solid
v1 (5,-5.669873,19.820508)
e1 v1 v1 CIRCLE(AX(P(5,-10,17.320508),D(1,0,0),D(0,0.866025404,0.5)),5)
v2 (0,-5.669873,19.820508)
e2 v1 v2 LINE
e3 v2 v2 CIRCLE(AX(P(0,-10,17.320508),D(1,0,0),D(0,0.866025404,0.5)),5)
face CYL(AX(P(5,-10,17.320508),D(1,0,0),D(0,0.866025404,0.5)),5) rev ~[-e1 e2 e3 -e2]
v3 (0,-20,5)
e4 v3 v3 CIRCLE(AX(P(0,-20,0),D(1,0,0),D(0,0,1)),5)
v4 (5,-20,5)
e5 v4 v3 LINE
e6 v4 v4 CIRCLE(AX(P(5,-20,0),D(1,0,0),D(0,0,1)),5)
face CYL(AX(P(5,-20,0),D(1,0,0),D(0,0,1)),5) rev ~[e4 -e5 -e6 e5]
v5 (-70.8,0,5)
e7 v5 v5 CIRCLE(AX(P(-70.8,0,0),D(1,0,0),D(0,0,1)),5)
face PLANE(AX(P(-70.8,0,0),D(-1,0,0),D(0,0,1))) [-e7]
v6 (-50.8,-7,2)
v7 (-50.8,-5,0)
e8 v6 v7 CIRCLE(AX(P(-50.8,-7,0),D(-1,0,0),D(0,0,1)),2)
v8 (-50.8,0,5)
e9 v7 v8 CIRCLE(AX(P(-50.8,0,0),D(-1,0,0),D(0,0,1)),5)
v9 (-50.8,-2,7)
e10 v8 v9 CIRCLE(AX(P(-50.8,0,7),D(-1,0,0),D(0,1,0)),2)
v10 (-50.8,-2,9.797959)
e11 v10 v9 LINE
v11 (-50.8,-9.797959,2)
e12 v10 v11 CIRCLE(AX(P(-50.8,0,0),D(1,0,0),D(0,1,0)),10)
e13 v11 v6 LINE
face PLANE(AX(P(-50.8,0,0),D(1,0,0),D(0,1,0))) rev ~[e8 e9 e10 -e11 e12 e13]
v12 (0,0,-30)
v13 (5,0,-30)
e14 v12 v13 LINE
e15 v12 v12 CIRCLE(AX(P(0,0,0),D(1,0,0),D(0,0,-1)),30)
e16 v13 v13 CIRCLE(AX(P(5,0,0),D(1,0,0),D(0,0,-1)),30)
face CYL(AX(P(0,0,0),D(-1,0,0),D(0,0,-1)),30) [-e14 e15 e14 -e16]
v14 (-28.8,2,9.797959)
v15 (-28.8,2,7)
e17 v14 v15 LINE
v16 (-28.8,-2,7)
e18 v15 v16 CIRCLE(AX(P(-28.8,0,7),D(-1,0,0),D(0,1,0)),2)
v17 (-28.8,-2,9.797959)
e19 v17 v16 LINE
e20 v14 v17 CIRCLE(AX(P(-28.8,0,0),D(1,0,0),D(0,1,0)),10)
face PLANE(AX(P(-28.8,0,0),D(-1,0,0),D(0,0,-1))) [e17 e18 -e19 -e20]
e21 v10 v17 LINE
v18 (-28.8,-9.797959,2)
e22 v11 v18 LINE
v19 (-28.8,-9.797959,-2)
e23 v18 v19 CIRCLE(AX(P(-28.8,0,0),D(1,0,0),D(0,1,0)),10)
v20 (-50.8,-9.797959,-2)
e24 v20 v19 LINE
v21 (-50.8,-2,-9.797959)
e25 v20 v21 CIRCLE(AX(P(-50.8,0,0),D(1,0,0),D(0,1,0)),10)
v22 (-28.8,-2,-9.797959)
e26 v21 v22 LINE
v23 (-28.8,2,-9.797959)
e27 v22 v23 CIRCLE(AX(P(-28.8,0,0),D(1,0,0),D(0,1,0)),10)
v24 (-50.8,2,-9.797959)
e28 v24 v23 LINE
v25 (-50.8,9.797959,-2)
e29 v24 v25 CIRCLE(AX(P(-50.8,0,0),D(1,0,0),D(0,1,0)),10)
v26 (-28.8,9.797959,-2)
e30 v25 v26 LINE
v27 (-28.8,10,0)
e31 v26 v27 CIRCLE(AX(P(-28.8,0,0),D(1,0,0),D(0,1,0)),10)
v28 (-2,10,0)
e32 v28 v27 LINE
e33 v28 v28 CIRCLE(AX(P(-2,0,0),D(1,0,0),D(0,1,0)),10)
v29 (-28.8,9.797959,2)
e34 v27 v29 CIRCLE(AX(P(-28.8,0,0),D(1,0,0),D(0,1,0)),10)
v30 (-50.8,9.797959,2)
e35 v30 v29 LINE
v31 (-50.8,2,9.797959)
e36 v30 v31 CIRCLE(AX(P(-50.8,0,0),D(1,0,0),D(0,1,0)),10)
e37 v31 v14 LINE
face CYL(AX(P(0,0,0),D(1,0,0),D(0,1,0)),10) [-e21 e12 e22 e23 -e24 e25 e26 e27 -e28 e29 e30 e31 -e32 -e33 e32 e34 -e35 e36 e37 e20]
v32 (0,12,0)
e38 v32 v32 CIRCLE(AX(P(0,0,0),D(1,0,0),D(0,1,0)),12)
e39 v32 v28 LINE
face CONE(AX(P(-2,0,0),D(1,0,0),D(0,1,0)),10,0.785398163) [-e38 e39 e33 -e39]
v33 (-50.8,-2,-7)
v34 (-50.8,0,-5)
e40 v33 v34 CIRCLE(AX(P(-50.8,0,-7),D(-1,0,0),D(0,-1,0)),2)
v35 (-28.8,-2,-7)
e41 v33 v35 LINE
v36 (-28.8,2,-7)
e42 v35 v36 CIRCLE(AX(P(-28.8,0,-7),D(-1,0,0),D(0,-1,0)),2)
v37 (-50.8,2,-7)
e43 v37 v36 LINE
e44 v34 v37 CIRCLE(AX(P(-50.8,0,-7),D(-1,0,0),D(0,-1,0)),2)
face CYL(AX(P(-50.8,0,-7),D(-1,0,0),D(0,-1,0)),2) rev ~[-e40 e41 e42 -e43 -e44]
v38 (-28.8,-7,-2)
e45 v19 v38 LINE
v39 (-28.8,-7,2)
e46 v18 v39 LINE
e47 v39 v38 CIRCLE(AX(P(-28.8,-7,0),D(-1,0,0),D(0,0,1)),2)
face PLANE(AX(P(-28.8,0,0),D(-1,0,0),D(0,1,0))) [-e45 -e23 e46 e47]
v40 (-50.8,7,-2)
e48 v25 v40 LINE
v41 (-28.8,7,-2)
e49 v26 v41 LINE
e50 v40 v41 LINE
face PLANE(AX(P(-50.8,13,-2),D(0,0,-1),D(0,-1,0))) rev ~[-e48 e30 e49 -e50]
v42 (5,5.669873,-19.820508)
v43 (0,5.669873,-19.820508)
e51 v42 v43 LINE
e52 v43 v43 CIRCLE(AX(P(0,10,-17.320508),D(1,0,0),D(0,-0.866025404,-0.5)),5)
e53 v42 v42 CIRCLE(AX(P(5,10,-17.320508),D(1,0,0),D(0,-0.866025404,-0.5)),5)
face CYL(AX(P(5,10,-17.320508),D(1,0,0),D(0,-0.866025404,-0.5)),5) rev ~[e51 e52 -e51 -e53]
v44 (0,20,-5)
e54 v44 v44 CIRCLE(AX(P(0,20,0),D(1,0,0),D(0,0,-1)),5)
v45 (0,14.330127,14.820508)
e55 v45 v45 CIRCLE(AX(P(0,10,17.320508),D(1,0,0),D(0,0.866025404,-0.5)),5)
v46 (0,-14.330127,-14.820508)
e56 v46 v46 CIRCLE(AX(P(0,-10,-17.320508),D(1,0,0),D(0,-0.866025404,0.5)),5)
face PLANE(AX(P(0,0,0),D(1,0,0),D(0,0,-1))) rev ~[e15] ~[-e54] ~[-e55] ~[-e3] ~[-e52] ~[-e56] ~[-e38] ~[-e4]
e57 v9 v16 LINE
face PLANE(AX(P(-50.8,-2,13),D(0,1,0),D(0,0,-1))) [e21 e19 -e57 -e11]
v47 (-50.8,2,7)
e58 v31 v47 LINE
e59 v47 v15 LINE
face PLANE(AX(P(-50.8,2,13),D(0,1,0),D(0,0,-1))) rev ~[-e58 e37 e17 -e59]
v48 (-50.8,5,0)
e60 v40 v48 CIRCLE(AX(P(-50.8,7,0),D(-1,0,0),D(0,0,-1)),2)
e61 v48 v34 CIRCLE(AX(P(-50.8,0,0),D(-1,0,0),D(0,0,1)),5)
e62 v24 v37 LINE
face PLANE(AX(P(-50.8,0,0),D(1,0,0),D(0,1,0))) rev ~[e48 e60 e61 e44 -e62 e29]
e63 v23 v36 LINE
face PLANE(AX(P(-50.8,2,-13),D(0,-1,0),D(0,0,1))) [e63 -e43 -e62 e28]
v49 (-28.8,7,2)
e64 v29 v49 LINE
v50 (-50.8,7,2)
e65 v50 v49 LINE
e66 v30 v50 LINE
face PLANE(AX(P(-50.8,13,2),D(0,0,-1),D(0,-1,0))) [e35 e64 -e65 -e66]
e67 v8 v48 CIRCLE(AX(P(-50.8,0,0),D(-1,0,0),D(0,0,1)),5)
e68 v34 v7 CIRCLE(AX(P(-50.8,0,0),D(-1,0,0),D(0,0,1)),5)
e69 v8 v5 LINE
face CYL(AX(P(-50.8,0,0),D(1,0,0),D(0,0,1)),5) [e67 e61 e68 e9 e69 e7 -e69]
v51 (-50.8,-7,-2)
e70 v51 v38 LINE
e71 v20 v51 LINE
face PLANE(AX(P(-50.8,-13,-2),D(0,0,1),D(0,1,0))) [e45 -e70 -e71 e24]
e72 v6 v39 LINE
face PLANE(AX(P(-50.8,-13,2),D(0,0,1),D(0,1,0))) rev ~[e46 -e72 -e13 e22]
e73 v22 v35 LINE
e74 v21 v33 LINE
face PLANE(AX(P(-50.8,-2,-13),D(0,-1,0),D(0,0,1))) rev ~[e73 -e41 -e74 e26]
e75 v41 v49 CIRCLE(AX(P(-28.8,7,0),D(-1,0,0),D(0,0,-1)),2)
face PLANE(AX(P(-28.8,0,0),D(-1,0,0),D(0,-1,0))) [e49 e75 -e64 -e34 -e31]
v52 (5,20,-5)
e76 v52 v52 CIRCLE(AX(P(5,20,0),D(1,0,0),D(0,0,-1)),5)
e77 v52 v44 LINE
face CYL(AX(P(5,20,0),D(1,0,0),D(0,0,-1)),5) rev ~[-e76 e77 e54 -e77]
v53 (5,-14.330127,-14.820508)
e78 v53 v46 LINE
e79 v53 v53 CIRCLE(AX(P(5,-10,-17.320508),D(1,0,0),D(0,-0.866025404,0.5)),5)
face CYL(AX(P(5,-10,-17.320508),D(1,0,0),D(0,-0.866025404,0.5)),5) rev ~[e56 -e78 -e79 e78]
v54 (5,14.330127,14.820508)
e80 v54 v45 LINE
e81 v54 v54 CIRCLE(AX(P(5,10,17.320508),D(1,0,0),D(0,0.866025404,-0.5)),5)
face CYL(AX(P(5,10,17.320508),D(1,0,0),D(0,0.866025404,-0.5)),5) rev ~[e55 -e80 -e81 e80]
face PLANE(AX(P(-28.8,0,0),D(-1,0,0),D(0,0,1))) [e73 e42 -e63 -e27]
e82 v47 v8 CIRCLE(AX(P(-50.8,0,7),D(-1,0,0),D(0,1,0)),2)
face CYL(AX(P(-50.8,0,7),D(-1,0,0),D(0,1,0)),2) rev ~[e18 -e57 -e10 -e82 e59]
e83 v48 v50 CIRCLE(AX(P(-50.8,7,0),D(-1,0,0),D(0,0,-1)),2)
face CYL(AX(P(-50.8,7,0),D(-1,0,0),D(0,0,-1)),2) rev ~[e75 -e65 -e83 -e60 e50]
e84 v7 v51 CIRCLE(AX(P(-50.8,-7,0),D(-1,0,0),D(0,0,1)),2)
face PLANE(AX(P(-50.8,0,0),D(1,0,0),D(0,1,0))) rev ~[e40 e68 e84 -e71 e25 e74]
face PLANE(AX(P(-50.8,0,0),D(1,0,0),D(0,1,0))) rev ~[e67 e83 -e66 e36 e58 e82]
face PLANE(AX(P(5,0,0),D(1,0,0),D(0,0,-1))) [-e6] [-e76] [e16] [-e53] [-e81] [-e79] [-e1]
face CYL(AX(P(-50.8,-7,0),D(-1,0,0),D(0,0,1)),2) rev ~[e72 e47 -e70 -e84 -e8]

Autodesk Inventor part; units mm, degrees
ref_plane "YZ Plane" through (0, 0, 0) normal (1, 0, 0) x (0, 1, 0)
ref_plane "XZ Plane" through (0, 0, 0) normal (0, 1, 0) x (-1, 0, 0)
sketch "Sketch1" plane through (0, 0, 0) normal (1, 0, 0) x (0, 1, 0)
  circle A0 centre (0, 0) radius 6.19 construction
  circle A1 centre (0, 0) radius 10
  dimension "d0" = 20
  dimension "d1" = 3.81
extrude "Main Shaft" add sketch "Sketch1" against normal blind 50.8
sketch "Sketch2" plane through (0, 0, 0) normal (1, 0, 0) x (0, 0, -1)
  circle A0 centre (0, 0) radius 30
  dimension "d4" = 60
extrude "CV Flange" add sketch "Sketch2" along normal blind 5
sketch "Sketch3" plane through (5, 0, 0) normal (1, 0, 0) x (0, 0, -1)
  circle A0 centre (0, 20) radius 5
  circle A1 centre (0, 0) radius 20 construction
  line L0 (0, 0) -> (0, 20) construction
  dimension "d7" = 40
  dimension "d8" = 10
extrude "CV Bolt Hole" cut sketch "Sketch3" against normal up to surface (5 mm away)
pattern_circular "CV Bolt Pattern" count 6 over 360 about axis through (-10, 0, 0) along (1, 0, 0) of "CV Bolt Hole"
chamfer "Weld_Chamfer" distance 2 angle 45 1 edges at (0, -10, 0)
ref_plane "Lock Pin Hole Plane" through (0, 0, 12.7) normal (0, 0, 1) x (1, 0, 0)
sketch "Sketch5" plane through (-50.8, 0, 0) normal (-1, 0, 0) x (0, 0, 1)
  line L0 (-20, 0) -> (15, 0) construction
  line L1 (0, 14) -> (0, -14) construction
  arc A0 (-13, 2) -> (-13, -2) centre (-13, 0) ccw
  arc A1 (-7, -2) -> (-7, 2) centre (-7, 0) ccw
  line L2 (-13, -2) -> (-7, -2)
  line L3 (-13, 2) -> (-7, 2)
  point P0 (0, 0)
  dimension "d23" = 2
  dimension "d24" = 7
  dimension "d25" = 6
extrude "Key Slot" cut sketch "Sketch5" against normal blind 22
pattern_circular "Circular Pattern2" count 4 over 360 about axis through (-10, 0, 0) along (1, 0, 0) of "Key Slot"
sketch "Sketch6" plane through (-50.8, 0, 0) normal (-1, 0, 0) x (0, 0, 1)
  circle A0 centre (0, 0) radius 5
  arc A1 (-7, -2) -> (-7, 2) centre (-7, 0) ccw projected
extrude "Extrusion6" add sketch "Sketch6" along normal blind 20
thread "M10x1.5 thread" size "M10x1.5" class "6g" standard "ANSI Metric M Profile" length 20 offset 5
equation "\"d1\" = Shaft_Wall_Thickness"
equation "\"d2\" = Shaft_Length"
equation "\"d4\" = Driveshaft_Flange_Diameter"
equation "\"d5\" = Driveshaft_Flange_Thickness"
equation "\"d7\" = CV_Bolt_Pattern_Diameter"
equation "\"d8\" = CV_Bolt_Hole_Diameter"
equation "\"Shaft_Diameter\" = 25.4"
equation "\"Shaft_Wall_Thickness\" = 3.81"
equation "\"Driveshaft_Flange_Diameter\" = 60"
equation "\"Driveshaft_Flange_Thickness\" = 5"
equation "\"CV_Bolt_Hole_Diameter\" = 10"
equation "\"d18\" = 0.5 * Shaft_Diameter"
equation "\"Shaft_Length\" = 50.8"
equation "\"CV_Bolt_Pattern_Diameter\" = 40"
properties part number "Hub-CV Adapter"
